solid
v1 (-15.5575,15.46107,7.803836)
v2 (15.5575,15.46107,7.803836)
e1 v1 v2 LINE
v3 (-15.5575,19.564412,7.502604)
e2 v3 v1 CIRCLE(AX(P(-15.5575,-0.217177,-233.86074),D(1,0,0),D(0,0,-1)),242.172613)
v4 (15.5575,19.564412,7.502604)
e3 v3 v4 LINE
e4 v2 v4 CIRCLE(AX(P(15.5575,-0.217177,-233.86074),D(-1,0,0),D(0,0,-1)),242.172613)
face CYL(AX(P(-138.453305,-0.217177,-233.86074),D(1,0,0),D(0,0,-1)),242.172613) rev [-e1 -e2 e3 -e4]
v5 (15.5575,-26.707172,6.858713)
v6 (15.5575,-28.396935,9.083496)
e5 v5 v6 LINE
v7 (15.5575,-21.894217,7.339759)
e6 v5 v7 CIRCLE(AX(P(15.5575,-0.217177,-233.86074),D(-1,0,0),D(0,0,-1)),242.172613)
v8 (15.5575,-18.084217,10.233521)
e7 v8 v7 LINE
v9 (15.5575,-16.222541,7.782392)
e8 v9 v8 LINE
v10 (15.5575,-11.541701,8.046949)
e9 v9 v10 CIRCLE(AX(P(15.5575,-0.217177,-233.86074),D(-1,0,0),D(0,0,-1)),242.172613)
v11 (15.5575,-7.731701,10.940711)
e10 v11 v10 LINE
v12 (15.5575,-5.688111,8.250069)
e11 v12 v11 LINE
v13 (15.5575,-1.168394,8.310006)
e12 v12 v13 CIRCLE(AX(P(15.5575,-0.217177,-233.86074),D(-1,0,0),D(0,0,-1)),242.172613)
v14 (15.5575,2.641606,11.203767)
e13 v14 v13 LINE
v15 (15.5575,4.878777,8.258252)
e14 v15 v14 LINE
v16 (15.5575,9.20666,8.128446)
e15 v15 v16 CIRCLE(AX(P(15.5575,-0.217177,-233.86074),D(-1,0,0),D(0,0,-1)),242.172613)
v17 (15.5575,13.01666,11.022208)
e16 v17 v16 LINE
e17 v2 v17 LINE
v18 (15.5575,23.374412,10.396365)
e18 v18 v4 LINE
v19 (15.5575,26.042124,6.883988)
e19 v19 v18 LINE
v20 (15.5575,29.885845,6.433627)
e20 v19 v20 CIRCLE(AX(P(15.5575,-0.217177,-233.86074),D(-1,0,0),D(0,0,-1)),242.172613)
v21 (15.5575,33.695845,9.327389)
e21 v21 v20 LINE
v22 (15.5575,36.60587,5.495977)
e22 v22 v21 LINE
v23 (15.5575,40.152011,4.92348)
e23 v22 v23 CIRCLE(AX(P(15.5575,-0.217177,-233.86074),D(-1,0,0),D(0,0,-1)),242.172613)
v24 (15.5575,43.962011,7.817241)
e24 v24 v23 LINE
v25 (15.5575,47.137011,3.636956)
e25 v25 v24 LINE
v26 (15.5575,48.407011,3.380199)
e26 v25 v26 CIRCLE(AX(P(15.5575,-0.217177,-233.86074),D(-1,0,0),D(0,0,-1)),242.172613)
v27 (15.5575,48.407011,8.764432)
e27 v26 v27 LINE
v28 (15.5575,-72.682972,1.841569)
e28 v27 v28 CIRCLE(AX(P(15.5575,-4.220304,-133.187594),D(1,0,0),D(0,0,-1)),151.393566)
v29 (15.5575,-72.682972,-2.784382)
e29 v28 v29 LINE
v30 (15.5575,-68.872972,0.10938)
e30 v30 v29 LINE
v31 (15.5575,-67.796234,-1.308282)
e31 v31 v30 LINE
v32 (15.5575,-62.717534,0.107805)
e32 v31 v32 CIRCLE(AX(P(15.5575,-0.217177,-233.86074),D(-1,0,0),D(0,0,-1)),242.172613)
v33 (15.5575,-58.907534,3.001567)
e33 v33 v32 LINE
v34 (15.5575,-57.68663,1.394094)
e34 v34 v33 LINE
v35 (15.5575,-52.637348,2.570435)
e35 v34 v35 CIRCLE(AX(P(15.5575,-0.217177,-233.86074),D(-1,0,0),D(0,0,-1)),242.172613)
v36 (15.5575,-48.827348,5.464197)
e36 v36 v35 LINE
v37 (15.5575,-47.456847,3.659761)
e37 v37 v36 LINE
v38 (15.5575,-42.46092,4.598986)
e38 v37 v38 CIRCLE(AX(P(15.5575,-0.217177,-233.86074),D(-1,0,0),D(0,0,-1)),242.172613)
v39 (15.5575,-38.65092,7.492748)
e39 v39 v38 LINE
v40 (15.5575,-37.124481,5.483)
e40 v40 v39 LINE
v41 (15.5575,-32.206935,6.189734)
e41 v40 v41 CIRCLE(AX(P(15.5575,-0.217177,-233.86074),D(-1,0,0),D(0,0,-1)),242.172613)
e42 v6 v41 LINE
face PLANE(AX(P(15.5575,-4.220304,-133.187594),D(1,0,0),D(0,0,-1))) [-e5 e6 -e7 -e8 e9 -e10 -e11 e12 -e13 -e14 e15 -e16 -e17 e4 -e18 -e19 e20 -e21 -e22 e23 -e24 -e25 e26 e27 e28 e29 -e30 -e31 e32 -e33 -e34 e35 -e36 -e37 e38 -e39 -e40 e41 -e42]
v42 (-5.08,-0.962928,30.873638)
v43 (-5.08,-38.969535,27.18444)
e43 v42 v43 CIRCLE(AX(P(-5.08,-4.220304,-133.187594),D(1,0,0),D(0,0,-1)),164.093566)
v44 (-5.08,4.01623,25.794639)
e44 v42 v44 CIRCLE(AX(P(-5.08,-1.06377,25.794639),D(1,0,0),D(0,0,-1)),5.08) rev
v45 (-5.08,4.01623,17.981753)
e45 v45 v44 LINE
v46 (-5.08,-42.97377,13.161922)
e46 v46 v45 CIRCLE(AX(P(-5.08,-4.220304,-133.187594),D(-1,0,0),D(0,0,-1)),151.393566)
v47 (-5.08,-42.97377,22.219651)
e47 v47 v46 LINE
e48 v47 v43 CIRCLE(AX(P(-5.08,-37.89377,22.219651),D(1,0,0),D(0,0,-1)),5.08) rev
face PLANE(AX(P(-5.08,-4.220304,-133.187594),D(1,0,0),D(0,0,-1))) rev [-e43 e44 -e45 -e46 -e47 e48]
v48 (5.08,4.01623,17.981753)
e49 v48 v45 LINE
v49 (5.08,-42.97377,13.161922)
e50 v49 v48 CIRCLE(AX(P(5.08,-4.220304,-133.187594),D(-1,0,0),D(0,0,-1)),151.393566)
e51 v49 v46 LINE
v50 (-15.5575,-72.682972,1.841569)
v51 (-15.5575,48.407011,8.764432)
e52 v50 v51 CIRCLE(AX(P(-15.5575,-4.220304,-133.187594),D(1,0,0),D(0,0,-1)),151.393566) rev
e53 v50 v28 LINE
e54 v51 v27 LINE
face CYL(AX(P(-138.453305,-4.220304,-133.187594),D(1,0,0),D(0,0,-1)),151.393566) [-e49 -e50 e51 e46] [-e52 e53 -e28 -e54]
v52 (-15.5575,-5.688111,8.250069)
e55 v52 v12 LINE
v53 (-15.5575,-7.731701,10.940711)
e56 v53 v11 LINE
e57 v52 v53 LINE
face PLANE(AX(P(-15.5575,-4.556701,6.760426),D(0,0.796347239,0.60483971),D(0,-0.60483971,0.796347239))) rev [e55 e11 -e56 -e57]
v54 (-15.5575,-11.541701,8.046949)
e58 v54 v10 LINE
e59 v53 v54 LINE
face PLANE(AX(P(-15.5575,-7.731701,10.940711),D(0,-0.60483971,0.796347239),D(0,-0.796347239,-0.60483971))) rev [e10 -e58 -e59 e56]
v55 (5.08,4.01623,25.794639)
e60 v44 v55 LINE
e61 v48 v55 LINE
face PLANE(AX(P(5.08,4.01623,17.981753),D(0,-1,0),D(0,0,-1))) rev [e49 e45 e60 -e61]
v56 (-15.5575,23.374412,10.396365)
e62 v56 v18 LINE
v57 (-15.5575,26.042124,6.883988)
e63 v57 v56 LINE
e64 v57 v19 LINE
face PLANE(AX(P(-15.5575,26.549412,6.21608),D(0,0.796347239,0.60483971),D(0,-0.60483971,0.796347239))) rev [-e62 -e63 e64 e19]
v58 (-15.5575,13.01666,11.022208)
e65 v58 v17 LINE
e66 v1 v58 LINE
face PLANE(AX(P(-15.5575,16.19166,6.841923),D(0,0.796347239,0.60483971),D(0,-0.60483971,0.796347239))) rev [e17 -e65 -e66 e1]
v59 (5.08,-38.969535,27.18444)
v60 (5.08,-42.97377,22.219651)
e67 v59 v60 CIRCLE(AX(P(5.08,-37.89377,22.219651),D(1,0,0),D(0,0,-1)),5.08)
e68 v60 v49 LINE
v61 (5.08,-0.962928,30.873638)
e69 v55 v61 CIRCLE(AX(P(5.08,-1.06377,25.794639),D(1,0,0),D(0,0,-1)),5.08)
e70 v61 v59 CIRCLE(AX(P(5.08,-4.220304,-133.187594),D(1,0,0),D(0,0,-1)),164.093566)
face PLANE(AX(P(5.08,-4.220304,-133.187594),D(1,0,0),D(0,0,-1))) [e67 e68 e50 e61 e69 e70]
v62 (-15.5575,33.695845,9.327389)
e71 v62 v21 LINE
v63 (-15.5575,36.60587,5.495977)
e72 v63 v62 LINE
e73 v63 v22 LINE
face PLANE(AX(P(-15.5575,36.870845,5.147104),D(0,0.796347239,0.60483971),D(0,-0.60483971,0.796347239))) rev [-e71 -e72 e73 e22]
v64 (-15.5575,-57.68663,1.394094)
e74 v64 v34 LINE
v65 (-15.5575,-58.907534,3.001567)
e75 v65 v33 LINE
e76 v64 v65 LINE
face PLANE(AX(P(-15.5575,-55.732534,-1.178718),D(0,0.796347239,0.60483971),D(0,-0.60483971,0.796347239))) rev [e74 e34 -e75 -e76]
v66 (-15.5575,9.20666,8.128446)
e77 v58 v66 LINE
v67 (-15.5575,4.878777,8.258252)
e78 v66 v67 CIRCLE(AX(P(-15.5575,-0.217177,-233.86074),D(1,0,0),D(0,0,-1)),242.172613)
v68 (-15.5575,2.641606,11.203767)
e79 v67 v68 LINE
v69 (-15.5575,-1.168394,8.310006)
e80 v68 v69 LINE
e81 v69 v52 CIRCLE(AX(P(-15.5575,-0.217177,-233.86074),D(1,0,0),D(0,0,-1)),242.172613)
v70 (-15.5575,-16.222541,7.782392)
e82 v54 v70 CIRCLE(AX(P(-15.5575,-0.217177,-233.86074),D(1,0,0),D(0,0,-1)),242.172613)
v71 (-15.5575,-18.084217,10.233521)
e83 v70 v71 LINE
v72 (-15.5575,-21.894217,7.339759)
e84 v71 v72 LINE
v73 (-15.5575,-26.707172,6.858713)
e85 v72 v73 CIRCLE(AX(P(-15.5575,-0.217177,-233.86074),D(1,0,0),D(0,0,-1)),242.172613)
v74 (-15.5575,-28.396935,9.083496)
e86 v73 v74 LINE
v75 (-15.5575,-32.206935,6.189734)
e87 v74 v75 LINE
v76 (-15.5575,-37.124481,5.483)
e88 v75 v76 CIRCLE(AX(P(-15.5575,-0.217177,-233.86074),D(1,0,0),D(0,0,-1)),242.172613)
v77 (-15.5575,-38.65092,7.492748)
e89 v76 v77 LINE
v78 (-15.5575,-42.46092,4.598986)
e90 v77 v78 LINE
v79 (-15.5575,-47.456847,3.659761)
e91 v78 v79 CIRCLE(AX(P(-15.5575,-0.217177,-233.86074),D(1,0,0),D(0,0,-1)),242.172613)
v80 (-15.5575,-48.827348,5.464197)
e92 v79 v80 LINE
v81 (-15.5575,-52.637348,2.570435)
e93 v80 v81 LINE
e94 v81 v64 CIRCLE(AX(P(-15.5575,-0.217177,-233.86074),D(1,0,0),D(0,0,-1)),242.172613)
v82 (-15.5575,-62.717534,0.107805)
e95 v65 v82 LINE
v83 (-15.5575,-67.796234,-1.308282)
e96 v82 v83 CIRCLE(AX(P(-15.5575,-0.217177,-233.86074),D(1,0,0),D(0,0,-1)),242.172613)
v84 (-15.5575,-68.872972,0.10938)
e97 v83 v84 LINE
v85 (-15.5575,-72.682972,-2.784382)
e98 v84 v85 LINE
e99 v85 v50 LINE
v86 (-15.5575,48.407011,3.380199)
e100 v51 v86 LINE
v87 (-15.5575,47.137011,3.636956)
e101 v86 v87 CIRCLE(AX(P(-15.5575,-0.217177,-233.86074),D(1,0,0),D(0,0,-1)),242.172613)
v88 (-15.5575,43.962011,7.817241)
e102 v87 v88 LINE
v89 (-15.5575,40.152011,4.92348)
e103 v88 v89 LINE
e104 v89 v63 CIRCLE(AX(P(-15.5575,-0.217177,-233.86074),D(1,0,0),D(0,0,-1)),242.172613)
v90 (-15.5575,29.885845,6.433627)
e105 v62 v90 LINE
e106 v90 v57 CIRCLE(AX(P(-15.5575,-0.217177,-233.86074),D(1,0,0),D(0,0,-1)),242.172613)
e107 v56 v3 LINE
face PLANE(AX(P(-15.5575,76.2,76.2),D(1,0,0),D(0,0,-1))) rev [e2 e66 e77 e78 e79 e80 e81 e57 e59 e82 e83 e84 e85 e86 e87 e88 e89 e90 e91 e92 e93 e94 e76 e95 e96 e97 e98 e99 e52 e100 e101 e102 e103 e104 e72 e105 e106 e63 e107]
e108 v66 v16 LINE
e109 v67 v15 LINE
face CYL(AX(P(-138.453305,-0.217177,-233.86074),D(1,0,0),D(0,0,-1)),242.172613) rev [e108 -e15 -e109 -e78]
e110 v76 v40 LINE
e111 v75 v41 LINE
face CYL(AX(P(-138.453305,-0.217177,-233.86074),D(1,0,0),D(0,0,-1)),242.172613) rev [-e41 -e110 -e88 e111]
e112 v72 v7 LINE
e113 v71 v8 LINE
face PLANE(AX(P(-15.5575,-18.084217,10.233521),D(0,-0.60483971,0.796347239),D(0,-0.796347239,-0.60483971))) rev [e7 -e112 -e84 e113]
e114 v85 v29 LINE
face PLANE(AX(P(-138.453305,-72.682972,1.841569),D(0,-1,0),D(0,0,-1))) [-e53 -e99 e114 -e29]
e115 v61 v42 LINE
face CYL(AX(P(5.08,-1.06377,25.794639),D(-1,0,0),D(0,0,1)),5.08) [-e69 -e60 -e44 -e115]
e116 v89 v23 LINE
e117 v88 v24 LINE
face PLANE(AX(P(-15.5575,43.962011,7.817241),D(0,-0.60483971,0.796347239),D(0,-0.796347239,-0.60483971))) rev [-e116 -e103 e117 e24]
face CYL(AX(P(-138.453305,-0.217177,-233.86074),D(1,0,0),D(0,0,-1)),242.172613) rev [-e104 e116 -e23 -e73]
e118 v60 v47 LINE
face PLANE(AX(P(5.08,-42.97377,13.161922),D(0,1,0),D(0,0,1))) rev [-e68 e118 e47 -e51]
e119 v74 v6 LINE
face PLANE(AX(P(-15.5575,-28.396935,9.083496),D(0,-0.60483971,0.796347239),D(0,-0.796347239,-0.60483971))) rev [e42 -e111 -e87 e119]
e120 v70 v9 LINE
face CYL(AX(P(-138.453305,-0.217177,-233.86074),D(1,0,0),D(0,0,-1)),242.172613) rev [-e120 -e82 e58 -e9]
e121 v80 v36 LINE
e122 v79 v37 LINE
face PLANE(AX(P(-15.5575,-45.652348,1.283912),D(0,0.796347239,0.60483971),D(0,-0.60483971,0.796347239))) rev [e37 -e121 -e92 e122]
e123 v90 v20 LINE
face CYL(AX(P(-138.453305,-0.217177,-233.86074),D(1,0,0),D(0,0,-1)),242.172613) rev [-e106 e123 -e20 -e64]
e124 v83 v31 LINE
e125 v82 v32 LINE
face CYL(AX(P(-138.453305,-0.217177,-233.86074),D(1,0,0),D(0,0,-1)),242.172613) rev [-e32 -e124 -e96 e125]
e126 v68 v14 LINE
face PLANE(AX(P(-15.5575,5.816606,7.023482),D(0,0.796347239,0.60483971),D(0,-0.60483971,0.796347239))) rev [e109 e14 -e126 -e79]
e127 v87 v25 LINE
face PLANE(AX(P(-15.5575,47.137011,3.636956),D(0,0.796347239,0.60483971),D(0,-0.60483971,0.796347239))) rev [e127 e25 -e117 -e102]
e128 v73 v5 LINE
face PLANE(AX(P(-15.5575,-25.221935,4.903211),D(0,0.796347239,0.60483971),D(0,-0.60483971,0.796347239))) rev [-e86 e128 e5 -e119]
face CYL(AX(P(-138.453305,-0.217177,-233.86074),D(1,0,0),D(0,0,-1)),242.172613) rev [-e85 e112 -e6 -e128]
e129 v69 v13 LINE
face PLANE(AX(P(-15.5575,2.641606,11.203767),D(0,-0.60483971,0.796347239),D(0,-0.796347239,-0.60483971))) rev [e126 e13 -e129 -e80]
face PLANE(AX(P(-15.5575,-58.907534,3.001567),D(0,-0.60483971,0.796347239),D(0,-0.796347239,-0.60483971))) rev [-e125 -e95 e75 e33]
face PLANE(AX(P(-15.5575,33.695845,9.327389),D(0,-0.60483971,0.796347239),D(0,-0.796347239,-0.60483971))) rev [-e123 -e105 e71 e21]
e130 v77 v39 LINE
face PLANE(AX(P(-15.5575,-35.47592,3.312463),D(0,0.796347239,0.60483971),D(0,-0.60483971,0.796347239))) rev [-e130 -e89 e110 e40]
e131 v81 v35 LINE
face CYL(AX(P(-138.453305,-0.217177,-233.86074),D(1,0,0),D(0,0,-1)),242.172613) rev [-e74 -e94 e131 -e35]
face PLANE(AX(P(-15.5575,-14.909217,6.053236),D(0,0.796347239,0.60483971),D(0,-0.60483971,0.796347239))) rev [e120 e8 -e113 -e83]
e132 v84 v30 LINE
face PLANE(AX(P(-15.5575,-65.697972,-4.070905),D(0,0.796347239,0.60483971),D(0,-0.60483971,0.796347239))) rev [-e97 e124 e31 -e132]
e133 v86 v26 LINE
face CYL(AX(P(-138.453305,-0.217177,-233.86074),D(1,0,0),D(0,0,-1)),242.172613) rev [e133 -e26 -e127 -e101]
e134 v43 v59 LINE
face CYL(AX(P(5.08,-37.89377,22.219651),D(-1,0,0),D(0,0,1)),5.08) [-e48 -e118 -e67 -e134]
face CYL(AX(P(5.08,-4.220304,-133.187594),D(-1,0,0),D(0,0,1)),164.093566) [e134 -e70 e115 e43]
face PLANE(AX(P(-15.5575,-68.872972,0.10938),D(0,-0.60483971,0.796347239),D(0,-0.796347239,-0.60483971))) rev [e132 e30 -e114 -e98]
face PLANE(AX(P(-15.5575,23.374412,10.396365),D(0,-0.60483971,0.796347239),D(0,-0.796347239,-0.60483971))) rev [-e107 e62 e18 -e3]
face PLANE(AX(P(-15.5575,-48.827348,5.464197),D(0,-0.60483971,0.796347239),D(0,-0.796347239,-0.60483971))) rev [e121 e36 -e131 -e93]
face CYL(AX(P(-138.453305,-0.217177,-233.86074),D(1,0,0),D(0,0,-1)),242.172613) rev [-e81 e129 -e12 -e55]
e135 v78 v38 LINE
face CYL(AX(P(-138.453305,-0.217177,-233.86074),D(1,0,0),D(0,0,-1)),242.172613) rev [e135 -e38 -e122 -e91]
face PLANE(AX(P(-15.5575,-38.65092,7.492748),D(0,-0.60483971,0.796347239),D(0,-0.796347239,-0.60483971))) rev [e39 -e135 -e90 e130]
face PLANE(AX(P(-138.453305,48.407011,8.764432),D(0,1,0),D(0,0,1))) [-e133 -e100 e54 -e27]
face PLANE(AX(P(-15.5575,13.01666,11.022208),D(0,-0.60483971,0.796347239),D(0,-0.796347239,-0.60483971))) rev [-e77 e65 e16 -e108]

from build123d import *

# Parameters (mm, degrees)
BOSS_EXTRUDE1_DEPTH      = 76.2
SKETCH2_W                = 6.985
SKETCH2_H                = 9.525
CUT_EXTRUDE1_DEPTH       = 119.84173867
CUT_EXTRUDE2_DEPTH       = 119.84173867
CUT_EXTRUDE3_DEPTH       = 119.84173867
FILLET1_R                = 2.54
CUT_EXTRUDE4_DEPTH       = 5.08
CUT_EXTRUDE6_DEPTH       = 15.113
FILLET2_R                = 0.508
BOSS_EXTRUDE3_DEPTH      = 31.115
BOSS_EXTRUDE4_DEPTH      = 5.08
CUT_EXTRUDE7_DEPTH       = 85.888967529
CRVPATTERN3_START        = 20.1179377
CRVPATTERN3_OUTLINE_W    = 31.115
CRVPATTERN3_OUTLINE_H    = 7.094089262
CRVPATTERN3_DEPTH        = 4.784345088
CRVPATTERN3_START_2      = 12.248105014
CRVPATTERN3_2_OUTLINE_W  = 31.115
CRVPATTERN3_2_OUTLINE_H  = 6.763167552
CRVPATTERN3_2_DEPTH      = 4.784345087
CRVPATTERN3_START_3      = 4.095774155
CRVPATTERN3_3_OUTLINE_W  = 31.115
CRVPATTERN3_3_OUTLINE_H  = 6.419828923
CRVPATTERN3_3_DEPTH      = 4.784345087
CRVPATTERN3_START_4      = -4.324087509
CRVPATTERN3_4_OUTLINE_W  = 31.115
CRVPATTERN3_4_OUTLINE_H  = 6.064703736
CRVPATTERN3_4_DEPTH      = 4.784345087
CRVPATTERN3_START_5      = 27.690823503
CRVPATTERN3_5_OUTLINE_W  = 31.115
CRVPATTERN3_5_OUTLINE_H  = 6.047255266
CRVPATTERN3_5_DEPTH      = 4.784345088
CRVPATTERN3_START_6      = -12.996021434
CRVPATTERN3_6_OUTLINE_W  = 31.115
CRVPATTERN3_6_OUTLINE_H  = 5.698443985
CRVPATTERN3_6_DEPTH      = 4.784345087
CRVPATTERN3_START_7      = -21.904106282
CRVPATTERN3_7_OUTLINE_W  = 31.115
CRVPATTERN3_7_OUTLINE_H  = 5.321722107
CRVPATTERN3_7_DEPTH      = 4.784345088
CRVPATTERN3_START_8      = -31.031987149
CRVPATTERN3_8_OUTLINE_W  = 31.115
CRVPATTERN3_8_OUTLINE_H  = 4.935229754
CRVPATTERN3_8_DEPTH      = 4.784345087
CRVPATTERN3_START_9      = -40.362905596
CRVPATTERN3_9_OUTLINE_W  = 31.115
CRVPATTERN3_9_OUTLINE_H  = 4.539676505
CRVPATTERN3_9_DEPTH      = 4.784345087
CRVPATTERN3_START_10     = -49.879730415
CRVPATTERN3_10_OUTLINE_W = 31.115
CRVPATTERN3_10_OUTLINE_H = 4.135788586
CRVPATTERN3_10_DEPTH     = 4.784345088
CRVPATTERN3_START_11     = -59.564989077
CRVPATTERN3_11_OUTLINE_W = 31.115
CRVPATTERN3_11_OUTLINE_H = 3.724307516
CRVPATTERN3_11_DEPTH     = 4.784345087
FILLET3_R                = 5.08


# Read off the part's stored shape, not the designer's step: CrvPattern3
with BuildPart() as part:
    # Sketch1 → Boss-Extrude1 (new body)
    with BuildSketch(Plane.XY):
        Polygon((-15.5575, 76.2), (15.5575, 76.2), (15.5575, -76.2), (7.845485509, -76.2), (9.525, -85.725), (-9.525, -85.725), (-7.845485509, -76.2), (-15.5575, -76.2), align=None)
    extrude(amount=BOSS_EXTRUDE1_DEPTH)

    # Sketch2 → Cut-Extrude1 (cut, through all)
    with BuildSketch(Plane(origin=(15.5575, 0, 0), x_dir=(0, 0, -1), z_dir=(1, 0, 0))):
        with Locations((-3.4925, -80.9625)):
            Rectangle(SKETCH2_W, SKETCH2_H)
    extrude(amount=-CUT_EXTRUDE1_DEPTH, mode=Mode.SUBTRACT)

    # Sketch3 → Cut-Extrude2 (cut, through all)
    with BuildSketch(Plane(origin=(15.5575, 0, 0), x_dir=(0, 0, -1), z_dir=(1, 0, 0))):
        with BuildLine():
            Line((-76.2, -85.725), (-76.2, -76.2))
            Line((-76.2, -76.2), (-76.2, 76.2))
            Line((-76.2, 76.2), (-6.541803462, 76.2))
            ThreePointArc((-6.541803462, 76.2), (-58.046669251, 2.411215556), (-76.2, -85.725))
        make_face()
        with BuildLine():
            Line((0, -76.2), (0, 67.75939176))
            ThreePointArc((0, 67.75939176), (-18.20597202, -4.22030412), (0, -76.2))
        make_face()
    extrude(amount=-CUT_EXTRUDE2_DEPTH, mode=Mode.SUBTRACT)

    # Sketch6 → Cut-Extrude3 (cut, through all)
    with BuildSketch(Plane(origin=(15.5575, 0, 0), x_dir=(0, 0, -1), z_dir=(1, 0, 0))):
        with BuildLine():
            ThreePointArc((-28.934409948, -61.883434575), (-23.879909813, -60.517759582), (-22.716254779, -55.412963136))
            ThreePointArc((-22.716254779, -55.412963136), (-30.753414225, -11.294498854), (-26.546552055, 33.352305435))
            ThreePointArc((-26.546552055, 33.352305435), (-49.181053892, -9.446405872), (-61.429710833, -56.286781256))
            ThreePointArc((-61.429710833, -56.286781256), (-59.737369376, -60.827463042), (-55.008021131, -61.883434575))
            ThreePointArc((-55.008021131, -61.883434575), (-41.971215539, -60.062859411), (-28.934409948, -61.883434575))
        make_face()
    extrude(amount=-CUT_EXTRUDE3_DEPTH, mode=Mode.SUBTRACT)

    # Fillet1
    fillet1_edges = [part.edges().sort_by_distance(p)[0] for p in [
        (0, 33.352305435, 26.546552055),
    ]]
    fillet(fillet1_edges, radius=FILLET1_R)

    # Sketch7 → Cut-Extrude4 (cut, symmetric)
    with BuildSketch(Plane(origin=(0, 0, 0), x_dir=(0, 0, -1), z_dir=(1, 0, 0))):
        with BuildLine():
            Line((-30.699128799, 4.016230293), (-17.981752538, 4.016230293))
            ThreePointArc((-17.981752538, 4.016230293), (-17.415803594, -19.667907964), (-13.161921654, -42.973769707))
            Line((-13.161921654, -42.973769707), (-26.264177108, -42.973769707))
            ThreePointArc((-26.264177108, -42.973769707), (-30.179968378, -19.639057999), (-30.699128799, 4.016230293))
        make_face()
    extrude(amount=CUT_EXTRUDE4_DEPTH, both=True, mode=Mode.SUBTRACT)

    # Sketch10 → Cut-Extrude6 (cut, symmetric)
    with BuildSketch(Plane(origin=(15.5575, 76.2, 6.541803462), x_dir=(-1, 0, 0), z_dir=(0, -0.7903999954772005, -0.6125910929401777))):
        Polygon((0, 5.170641427), (6.985, 5.170641427), (0, -3.655858573), align=None)
        Polygon((31.115, 5.170641427), (31.115, -3.655858573), (24.13, 5.170641427), align=None)
    extrude(amount=CUT_EXTRUDE6_DEPTH, both=True, mode=Mode.SUBTRACT)

    # Fillet2
    fillet2_edges = [part.edges().sort_by_distance(p)[0] for p in [
        (0, 76.2, 6.541803462),
        (-14.111333502, 74.930435776, 7.871138317),
        (14.111333502, 74.930435776, 7.871138317),
        (-15.5575, 5.090891194, 56.873019023),
        (15.5575, 5.090891194, 56.873019023),
    ]]
    fillet(fillet2_edges, radius=FILLET2_R)


with BuildPart() as body_2:
    # Sketch11 → Boss-Extrude3 (new body)
    with BuildSketch(Plane(origin=(15.5575, 0, 0), x_dir=(0, 0, -1), z_dir=(1, 0, 0))):
        with BuildLine():
            Line((-8.76443151, 48.407010808), (-3.38019913, 48.407010808))
            ThreePointArc((-3.38019913, 48.407010808), (-7.998658724, -12.530018981), (2.784381833, -72.682972398))
            Line((2.784381833, -72.682972398), (-1.84156903, -72.682972398))
            ThreePointArc((-1.84156903, -72.682972398), (-17.95915827, -12.861548832), (-8.76443151, 48.407010808))
        make_face()
    extrude(amount=-BOSS_EXTRUDE3_DEPTH)


with BuildPart() as body_3:
    # Sketch13 → Boss-Extrude4 (new, symmetric)
    with BuildSketch(Plane(origin=(0, 0, 0), x_dir=(0, 0, -1), z_dir=(1, 0, 0))):
        with BuildLine():
            Line((-13.161921654, -42.973769707), (-26.264177108, -42.973769707))
            ThreePointArc((-26.264177108, -42.973769707), (-30.179968378, -19.639057999), (-30.699128799, 4.016230293))
            Line((-30.699128799, 4.016230293), (-17.981752538, 4.016230293))
            ThreePointArc((-17.981752538, 4.016230293), (-17.415803594, -19.667907964), (-13.161921654, -42.973769707))
        make_face()
    extrude(amount=BOSS_EXTRUDE4_DEPTH, both=True)


with BuildPart() as body_2_1:
    add(body_2.part)

    # Combine1: union body 3
    add(body_3.part)

    # Sketch14 → Cut-Extrude7 (cut, through all)
    with BuildSketch(Plane(origin=(15.5575, 0, 0), x_dir=(0, 0, -1), z_dir=(1, 0, 0))):
        Polygon((-3.636956276, 47.137010808), (-0.743194378, 43.327010808), (-4.923479567, 40.152010808), (-7.817241465, 43.962010808), align=None)
    extrude(amount=-CUT_EXTRUDE7_DEPTH, mode=Mode.SUBTRACT)

    # CrvPattern3 outline → CrvPattern3 (cut)
    with BuildSketch(Plane(origin=(0, 0, 0), x_dir=(1, 0, 0), z_dir=(0, 0.7963472387815729, 0.604839710406786)).offset(CRVPATTERN3_START)):
        with Locations((0, 9.405700103)):
            Rectangle(CRVPATTERN3_OUTLINE_W, CRVPATTERN3_OUTLINE_H)
    extrude(amount=CRVPATTERN3_DEPTH, mode=Mode.SUBTRACT)

    # CrvPattern3 2 outline → CrvPattern3 2 (cut)
    with BuildSketch(Plane(origin=(0, 0, 0), x_dir=(1, 0, 0), z_dir=(0, 0.7963472387815729, 0.604839710406786)).offset(CRVPATTERN3_START_2)):
        with Locations((0, 2.477071696)):
            Rectangle(CRVPATTERN3_2_OUTLINE_W, CRVPATTERN3_2_OUTLINE_H)
    extrude(amount=CRVPATTERN3_2_DEPTH, mode=Mode.SUBTRACT)

    # CrvPattern3 3 outline → CrvPattern3 3 (cut)
    with BuildSketch(Plane(origin=(0, 0, 0), x_dir=(1, 0, 0), z_dir=(0, 0.7963472387815729, 0.604839710406786)).offset(CRVPATTERN3_START_3)):
        with Locations((0, -4.114426542)):
            Rectangle(CRVPATTERN3_3_OUTLINE_W, CRVPATTERN3_3_OUTLINE_H)
    extrude(amount=CRVPATTERN3_3_DEPTH, mode=Mode.SUBTRACT)

    # CrvPattern3 4 outline → CrvPattern3 4 (cut)
    with BuildSketch(Plane(origin=(0, 0, 0), x_dir=(1, 0, 0), z_dir=(0, 0.7963472387815729, 0.604839710406786)).offset(CRVPATTERN3_START_4)):
        with Locations((0, -10.356692871)):
            Rectangle(CRVPATTERN3_4_OUTLINE_W, CRVPATTERN3_4_OUTLINE_H)
    extrude(amount=CRVPATTERN3_4_DEPTH, mode=Mode.SUBTRACT)

    # CrvPattern3 5 outline → CrvPattern3 5 (cut)
    with BuildSketch(Plane(origin=(0, 0, 0), x_dir=(1, 0, 0), z_dir=(0, 0.7963472387815729, 0.604839710406786)).offset(CRVPATTERN3_START_5)):
        with Locations((0, 15.976372367)):
            Rectangle(CRVPATTERN3_5_OUTLINE_W, CRVPATTERN3_5_OUTLINE_H)
    extrude(amount=CRVPATTERN3_5_DEPTH, mode=Mode.SUBTRACT)

    # CrvPattern3 6 outline → CrvPattern3 6 (cut)
    with BuildSketch(Plane(origin=(0, 0, 0), x_dir=(1, 0, 0), z_dir=(0, 0.7963472387815729, 0.604839710406786)).offset(CRVPATTERN3_START_6)):
        with Locations((0, -16.238266732)):
            Rectangle(CRVPATTERN3_6_OUTLINE_W, CRVPATTERN3_6_OUTLINE_H)
    extrude(amount=CRVPATTERN3_6_DEPTH, mode=Mode.SUBTRACT)

    # CrvPattern3 7 outline → CrvPattern3 7 (cut)
    with BuildSketch(Plane(origin=(0, 0, 0), x_dir=(1, 0, 0), z_dir=(0, 0.7963472387815729, 0.604839710406786)).offset(CRVPATTERN3_START_7)):
        with Locations((0, -21.748349778)):
            Rectangle(CRVPATTERN3_7_OUTLINE_W, CRVPATTERN3_7_OUTLINE_H)
    extrude(amount=CRVPATTERN3_7_DEPTH, mode=Mode.SUBTRACT)

    # CrvPattern3 8 outline → CrvPattern3 8 (cut)
    with BuildSketch(Plane(origin=(0, 0, 0), x_dir=(1, 0, 0), z_dir=(0, 0.7963472387815729, 0.604839710406786)).offset(CRVPATTERN3_START_8)):
        with Locations((0, -26.876825708)):
            Rectangle(CRVPATTERN3_8_OUTLINE_W, CRVPATTERN3_8_OUTLINE_H)
    extrude(amount=CRVPATTERN3_8_DEPTH, mode=Mode.SUBTRACT)

    # CrvPattern3 9 outline → CrvPattern3 9 (cut)
    with BuildSketch(Plane(origin=(0, 0, 0), x_dir=(1, 0, 0), z_dir=(0, 0.7963472387815729, 0.604839710406786)).offset(CRVPATTERN3_START_9)):
        with Locations((0, -31.614278838)):
            Rectangle(CRVPATTERN3_9_OUTLINE_W, CRVPATTERN3_9_OUTLINE_H)
    extrude(amount=CRVPATTERN3_9_DEPTH, mode=Mode.SUBTRACT)

    # CrvPattern3 10 outline → CrvPattern3 10 (cut)
    with BuildSketch(Plane(origin=(0, 0, 0), x_dir=(1, 0, 0), z_dir=(0, 0.7963472387815729, 0.604839710406786)).offset(CRVPATTERN3_START_10)):
        with Locations((0, -35.952011383)):
            Rectangle(CRVPATTERN3_10_OUTLINE_W, CRVPATTERN3_10_OUTLINE_H)
    extrude(amount=CRVPATTERN3_10_DEPTH, mode=Mode.SUBTRACT)

    # CrvPattern3 11 outline → CrvPattern3 11 (cut)
    with BuildSketch(Plane(origin=(0, 0, 0), x_dir=(1, 0, 0), z_dir=(0, 0.7963472387815729, 0.604839710406786)).offset(CRVPATTERN3_START_11)):
        with Locations((0, -39.882059434)):
            Rectangle(CRVPATTERN3_11_OUTLINE_W, CRVPATTERN3_11_OUTLINE_H)
    extrude(amount=CRVPATTERN3_11_DEPTH, mode=Mode.SUBTRACT)

    # Fillet3
    fillet3_edges = [body_2_1.edges().sort_by_distance(p)[0] for p in [
        (0, 4.016230293, 30.699128799),
        (0, -42.973769707, 26.264177108),
    ]]
    fillet(fillet3_edges, radius=FILLET3_R)


solid = body_2_1.part
